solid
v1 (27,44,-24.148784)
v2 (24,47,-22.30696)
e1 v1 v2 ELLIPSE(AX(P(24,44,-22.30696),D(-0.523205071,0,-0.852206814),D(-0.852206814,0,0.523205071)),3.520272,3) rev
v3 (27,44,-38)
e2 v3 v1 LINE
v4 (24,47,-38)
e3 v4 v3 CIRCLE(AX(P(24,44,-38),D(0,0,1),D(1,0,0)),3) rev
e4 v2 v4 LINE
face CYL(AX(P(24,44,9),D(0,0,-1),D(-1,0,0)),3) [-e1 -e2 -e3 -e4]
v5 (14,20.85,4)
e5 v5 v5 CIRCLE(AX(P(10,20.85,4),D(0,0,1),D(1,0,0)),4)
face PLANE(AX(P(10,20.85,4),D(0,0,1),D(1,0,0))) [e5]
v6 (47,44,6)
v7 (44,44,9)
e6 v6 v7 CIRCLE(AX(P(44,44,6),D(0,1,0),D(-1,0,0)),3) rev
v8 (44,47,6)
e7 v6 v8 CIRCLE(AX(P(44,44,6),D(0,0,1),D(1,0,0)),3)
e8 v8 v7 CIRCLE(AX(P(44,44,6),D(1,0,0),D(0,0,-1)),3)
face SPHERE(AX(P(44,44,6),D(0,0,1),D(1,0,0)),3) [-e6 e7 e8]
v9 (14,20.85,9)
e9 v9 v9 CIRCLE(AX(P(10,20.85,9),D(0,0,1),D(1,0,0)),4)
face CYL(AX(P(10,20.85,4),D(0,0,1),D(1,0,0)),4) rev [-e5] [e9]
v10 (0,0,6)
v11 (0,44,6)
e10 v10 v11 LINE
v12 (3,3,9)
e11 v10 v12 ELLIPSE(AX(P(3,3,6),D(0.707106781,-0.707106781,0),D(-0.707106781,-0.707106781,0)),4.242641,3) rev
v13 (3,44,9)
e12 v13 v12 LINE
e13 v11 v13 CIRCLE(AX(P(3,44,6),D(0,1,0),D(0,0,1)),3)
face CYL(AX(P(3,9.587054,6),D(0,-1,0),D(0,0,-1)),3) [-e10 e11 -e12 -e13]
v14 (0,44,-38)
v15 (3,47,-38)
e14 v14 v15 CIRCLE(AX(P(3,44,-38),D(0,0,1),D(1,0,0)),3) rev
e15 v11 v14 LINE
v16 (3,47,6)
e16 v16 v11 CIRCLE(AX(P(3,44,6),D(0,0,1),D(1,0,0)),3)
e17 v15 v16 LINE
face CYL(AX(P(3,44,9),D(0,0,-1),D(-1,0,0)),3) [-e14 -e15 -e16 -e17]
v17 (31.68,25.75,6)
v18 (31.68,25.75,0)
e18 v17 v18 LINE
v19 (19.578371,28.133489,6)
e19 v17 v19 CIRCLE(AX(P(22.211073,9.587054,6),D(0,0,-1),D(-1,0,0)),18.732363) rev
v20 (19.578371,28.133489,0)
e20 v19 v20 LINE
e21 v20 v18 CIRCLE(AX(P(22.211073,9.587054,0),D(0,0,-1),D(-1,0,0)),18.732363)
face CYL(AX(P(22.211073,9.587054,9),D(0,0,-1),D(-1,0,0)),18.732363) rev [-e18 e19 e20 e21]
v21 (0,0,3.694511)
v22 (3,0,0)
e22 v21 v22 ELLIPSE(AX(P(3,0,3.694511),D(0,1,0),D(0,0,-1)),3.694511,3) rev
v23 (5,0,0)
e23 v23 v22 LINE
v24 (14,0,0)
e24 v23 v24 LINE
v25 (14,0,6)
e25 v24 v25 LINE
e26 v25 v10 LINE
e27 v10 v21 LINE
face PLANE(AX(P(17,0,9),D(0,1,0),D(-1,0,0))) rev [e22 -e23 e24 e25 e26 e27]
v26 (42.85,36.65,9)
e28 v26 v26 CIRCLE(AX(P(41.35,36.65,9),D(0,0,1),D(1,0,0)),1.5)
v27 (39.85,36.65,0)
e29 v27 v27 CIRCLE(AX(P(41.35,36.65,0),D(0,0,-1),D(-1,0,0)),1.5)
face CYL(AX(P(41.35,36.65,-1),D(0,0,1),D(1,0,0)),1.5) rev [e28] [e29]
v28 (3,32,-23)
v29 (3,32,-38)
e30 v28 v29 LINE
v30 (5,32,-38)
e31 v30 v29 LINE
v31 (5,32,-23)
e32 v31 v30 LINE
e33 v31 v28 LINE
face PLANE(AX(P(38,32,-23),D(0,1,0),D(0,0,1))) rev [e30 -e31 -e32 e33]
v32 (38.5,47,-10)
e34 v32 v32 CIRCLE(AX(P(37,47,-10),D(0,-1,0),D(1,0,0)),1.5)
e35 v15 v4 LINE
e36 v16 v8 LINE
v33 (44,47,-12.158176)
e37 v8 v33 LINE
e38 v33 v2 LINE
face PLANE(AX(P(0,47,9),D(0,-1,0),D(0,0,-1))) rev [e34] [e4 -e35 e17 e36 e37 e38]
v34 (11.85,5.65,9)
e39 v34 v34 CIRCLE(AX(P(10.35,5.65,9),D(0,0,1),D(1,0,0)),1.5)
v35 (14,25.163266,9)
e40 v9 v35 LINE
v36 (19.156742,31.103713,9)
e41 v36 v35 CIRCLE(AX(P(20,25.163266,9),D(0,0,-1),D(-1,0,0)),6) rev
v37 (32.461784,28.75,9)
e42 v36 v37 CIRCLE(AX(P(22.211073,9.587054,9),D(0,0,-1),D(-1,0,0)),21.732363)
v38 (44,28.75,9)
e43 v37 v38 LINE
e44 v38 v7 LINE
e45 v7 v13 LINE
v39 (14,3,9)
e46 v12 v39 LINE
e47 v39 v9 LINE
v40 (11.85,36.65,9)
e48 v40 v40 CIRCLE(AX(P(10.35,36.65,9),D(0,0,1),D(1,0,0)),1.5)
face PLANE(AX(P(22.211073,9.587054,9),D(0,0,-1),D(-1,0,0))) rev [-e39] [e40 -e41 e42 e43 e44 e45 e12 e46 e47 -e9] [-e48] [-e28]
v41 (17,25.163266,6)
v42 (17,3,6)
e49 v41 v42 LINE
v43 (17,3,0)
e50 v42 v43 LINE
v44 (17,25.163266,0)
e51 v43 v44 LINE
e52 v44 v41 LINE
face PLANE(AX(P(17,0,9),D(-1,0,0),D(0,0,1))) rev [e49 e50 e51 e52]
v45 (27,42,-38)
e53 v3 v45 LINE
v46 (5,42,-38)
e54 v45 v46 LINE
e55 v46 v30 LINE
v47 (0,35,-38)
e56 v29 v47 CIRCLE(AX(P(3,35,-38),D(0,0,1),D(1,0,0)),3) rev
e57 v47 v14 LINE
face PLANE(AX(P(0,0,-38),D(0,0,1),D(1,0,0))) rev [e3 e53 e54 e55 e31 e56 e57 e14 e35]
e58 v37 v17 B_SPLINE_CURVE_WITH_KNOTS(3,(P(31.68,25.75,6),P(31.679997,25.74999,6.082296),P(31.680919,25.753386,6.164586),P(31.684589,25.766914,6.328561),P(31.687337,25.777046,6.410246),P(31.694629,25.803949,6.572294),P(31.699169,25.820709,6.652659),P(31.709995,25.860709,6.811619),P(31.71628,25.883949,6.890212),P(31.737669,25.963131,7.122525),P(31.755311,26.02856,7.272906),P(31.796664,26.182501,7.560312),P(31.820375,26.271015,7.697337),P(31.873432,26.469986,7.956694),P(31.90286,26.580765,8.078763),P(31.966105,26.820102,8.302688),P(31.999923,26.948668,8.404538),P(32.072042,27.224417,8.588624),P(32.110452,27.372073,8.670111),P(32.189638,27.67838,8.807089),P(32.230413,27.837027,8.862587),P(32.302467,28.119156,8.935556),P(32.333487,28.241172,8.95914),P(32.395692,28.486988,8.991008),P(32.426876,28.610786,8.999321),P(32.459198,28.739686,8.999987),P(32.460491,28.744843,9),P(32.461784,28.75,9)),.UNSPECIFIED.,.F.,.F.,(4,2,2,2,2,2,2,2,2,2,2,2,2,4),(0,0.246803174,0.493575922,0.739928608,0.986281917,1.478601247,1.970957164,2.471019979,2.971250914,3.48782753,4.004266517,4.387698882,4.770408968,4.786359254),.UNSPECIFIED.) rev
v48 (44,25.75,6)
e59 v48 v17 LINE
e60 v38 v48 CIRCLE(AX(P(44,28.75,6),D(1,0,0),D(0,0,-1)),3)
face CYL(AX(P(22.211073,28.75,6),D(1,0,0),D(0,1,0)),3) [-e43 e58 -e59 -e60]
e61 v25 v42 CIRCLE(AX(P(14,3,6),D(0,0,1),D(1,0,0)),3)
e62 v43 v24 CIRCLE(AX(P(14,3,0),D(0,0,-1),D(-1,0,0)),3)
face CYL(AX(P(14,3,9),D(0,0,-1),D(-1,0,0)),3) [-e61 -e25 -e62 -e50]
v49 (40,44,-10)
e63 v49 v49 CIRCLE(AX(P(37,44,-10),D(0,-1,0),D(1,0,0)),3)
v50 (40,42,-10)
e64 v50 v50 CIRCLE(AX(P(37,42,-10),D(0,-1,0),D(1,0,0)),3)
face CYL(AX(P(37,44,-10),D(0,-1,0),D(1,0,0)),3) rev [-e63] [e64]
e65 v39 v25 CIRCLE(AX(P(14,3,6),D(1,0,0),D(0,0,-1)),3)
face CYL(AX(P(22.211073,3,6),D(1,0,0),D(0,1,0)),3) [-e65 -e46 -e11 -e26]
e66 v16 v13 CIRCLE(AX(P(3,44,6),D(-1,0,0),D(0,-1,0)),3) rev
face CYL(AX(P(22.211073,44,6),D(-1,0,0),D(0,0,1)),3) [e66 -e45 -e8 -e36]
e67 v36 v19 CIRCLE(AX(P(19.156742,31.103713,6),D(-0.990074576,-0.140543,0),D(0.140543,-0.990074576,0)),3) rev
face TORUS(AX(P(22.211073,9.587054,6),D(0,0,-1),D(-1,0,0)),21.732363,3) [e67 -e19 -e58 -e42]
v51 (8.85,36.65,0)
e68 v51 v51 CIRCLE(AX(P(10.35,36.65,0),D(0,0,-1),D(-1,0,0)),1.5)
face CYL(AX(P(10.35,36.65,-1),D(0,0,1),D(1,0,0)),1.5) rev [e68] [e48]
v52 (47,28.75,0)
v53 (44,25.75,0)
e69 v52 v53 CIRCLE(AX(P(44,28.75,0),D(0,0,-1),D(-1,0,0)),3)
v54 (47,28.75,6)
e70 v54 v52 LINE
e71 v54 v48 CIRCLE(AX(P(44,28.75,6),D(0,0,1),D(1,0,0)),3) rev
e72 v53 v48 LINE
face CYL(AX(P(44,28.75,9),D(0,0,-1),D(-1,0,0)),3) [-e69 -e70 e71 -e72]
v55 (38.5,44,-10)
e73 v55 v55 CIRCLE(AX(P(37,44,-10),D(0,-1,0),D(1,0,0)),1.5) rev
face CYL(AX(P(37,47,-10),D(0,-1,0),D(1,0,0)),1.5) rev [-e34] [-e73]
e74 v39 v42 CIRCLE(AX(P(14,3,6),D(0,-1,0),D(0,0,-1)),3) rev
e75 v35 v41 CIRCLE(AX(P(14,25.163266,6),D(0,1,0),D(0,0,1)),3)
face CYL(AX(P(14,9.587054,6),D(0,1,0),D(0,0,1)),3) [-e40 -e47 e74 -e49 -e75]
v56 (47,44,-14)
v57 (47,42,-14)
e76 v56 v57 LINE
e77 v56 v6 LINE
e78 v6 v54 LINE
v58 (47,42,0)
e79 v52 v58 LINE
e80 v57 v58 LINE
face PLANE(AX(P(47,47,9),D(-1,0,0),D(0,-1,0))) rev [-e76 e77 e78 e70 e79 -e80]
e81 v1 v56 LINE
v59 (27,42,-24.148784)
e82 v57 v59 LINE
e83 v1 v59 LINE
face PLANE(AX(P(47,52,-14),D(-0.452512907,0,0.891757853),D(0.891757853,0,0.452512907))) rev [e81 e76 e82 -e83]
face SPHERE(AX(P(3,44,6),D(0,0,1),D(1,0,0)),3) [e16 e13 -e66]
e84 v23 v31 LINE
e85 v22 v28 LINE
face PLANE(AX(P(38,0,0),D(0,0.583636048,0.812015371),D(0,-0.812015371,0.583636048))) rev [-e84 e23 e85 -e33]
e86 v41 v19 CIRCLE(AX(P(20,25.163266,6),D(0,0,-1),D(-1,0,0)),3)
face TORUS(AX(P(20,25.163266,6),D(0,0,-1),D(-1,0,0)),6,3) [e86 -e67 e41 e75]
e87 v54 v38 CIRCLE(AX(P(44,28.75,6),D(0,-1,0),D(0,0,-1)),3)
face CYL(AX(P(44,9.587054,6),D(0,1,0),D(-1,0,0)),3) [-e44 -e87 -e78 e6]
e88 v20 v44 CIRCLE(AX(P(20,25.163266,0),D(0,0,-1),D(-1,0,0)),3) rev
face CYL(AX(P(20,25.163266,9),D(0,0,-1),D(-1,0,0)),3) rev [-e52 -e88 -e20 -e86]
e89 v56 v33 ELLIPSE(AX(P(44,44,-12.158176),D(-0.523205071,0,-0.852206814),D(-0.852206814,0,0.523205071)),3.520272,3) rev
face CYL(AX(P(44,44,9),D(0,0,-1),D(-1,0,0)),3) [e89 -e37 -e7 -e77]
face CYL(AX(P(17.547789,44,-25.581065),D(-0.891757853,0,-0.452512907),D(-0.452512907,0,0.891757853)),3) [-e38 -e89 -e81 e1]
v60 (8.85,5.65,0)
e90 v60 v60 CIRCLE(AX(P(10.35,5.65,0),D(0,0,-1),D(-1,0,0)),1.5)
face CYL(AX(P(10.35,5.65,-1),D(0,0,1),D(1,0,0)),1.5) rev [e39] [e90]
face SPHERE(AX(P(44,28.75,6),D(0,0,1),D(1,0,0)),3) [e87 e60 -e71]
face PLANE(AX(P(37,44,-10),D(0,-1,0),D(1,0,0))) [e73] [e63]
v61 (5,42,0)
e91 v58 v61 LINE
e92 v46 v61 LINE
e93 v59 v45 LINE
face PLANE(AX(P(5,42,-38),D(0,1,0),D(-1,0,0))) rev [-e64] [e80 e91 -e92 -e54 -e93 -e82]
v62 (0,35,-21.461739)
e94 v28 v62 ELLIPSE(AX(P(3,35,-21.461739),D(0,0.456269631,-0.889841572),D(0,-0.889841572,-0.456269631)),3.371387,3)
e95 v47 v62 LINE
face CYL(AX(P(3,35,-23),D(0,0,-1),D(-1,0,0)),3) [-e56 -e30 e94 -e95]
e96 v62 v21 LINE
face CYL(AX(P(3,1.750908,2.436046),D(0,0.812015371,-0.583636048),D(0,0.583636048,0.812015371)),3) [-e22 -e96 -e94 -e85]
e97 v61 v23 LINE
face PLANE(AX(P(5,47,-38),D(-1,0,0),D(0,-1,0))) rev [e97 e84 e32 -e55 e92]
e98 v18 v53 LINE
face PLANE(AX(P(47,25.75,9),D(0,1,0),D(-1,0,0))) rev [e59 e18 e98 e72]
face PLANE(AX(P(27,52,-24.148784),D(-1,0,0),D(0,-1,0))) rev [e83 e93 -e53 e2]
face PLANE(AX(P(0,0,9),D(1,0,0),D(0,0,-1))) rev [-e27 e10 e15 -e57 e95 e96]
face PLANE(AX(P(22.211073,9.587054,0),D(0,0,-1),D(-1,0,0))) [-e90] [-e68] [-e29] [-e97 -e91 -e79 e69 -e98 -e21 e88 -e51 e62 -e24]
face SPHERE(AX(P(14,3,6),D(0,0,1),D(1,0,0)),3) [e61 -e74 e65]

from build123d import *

# Parameters (mm, degrees)
BOSS_EXTRUDE1_DEPTH = 9
SKETCH3_R           = 1.5
CUT_EXTRUDE1_DEPTH  = 10
SKETCH8_W           = 5
SKETCH8_H           = 47
BOSS_EXTRUDE2_DEPTH = 38
SKETCH9_W           = 42
SKETCH9_H           = 5
BOSS_EXTRUDE3_DEPTH = 38
CUT_EXTRUDE2_DEPTH  = 38
SKETCH11_R          = 4
CUT_EXTRUDE3_DEPTH  = 5
CUT_EXTRUDE4_DEPTH  = 10
SKETCH13_R          = 1.5
CUT_EXTRUDE5_DEPTH  = 74.600271739
SKETCH14_R          = 3
CUT_EXTRUDE6_DEPTH  = 2
FILLET1_R           = 3


with BuildPart() as part:
    # Sketch2 → Boss-Extrude1 (new body)
    with BuildSketch(Plane.XY):
        with BuildLine():
            Line((0, 0), (0, 47))
            Line((0, 47), (47, 47))
            Line((47, 47), (47, 25.75))
            Line((47, 25.75), (31.68, 25.75))
            ThreePointArc((31.68, 25.75), (24.5283031, 28.175540714), (17, 27.58))
            Line((17, 27.58), (17, 0))
            Line((17, 0), (0, 0))
        make_face()
    extrude(amount=BOSS_EXTRUDE1_DEPTH)

    # Sketch3 → Cut-Extrude1 (cut)
    with BuildSketch(Plane.XY.offset(9)):
        with Locations((10.35, 5.65)):
            Circle(SKETCH3_R)
        with Locations((10.35, 36.65)):
            Circle(SKETCH3_R)
        with Locations((41.35, 36.65)):
            Circle(SKETCH3_R)
    extrude(amount=-CUT_EXTRUDE1_DEPTH, mode=Mode.SUBTRACT)

    # Sketch8 → Boss-Extrude2 (add)
    with BuildSketch(Plane(origin=(0, 0, 0), x_dir=(-1, 0, 0), z_dir=(0, 0, -1))):
        with Locations((-2.5, 23.5)):
            Rectangle(SKETCH8_W, SKETCH8_H)
    extrude(amount=BOSS_EXTRUDE2_DEPTH)

    # Sketch9 → Boss-Extrude3 (add)
    with BuildSketch(Plane(origin=(0, 0, 0), x_dir=(-1, 0, 0), z_dir=(0, 0, -1))):
        with Locations((-26, 44.5)):
            Rectangle(SKETCH9_W, SKETCH9_H)
    extrude(amount=BOSS_EXTRUDE3_DEPTH)

    # Sketch10 → Cut-Extrude2 (cut)
    with BuildSketch(Plane.ZY):
        Polygon((0, 0), (-23, 32), (-38, 32), (-38, 0), align=None)
    extrude(amount=-CUT_EXTRUDE2_DEPTH, mode=Mode.SUBTRACT)

    # Sketch11 → Cut-Extrude3 (cut)
    with BuildSketch(Plane.XY.offset(9)):
        with Locations((10, 20.85)):
            Circle(SKETCH11_R)
    extrude(amount=-CUT_EXTRUDE3_DEPTH, mode=Mode.SUBTRACT)

    # Sketch12 → Cut-Extrude4 (cut)
    with BuildSketch(Plane.XZ.offset(-42)):
        Polygon((47, -38), (47, -14), (27, -24.148784343), (27, -38), align=None)
    extrude(amount=-CUT_EXTRUDE4_DEPTH, mode=Mode.SUBTRACT)

    # Sketch13 → Cut-Extrude5 (cut, through all)
    with BuildSketch(Plane.XZ.offset(-42)):
        with Locations((37, -10)):
            Circle(SKETCH13_R)
    extrude(amount=-CUT_EXTRUDE5_DEPTH, mode=Mode.SUBTRACT)

    # Sketch14 → Cut-Extrude6 (cut)
    with BuildSketch(Plane(origin=(0, 42, 0), x_dir=(-1, 0, 0), z_dir=(0, -1, 0))):
        with Locations(Location((-37, 10, 0), (0, 0, 180))):
            Circle(SKETCH14_R)
    extrude(amount=-CUT_EXTRUDE6_DEPTH, mode=Mode.SUBTRACT)

    # Fillet1
    fillet1_edges = [part.edges().sort_by_distance(p)[0] for p in [
        (24.5283031, 28.175540714, 9),
        (0, 47, -14.5),
        (47, 47, -2.5),
        (47, 25.75, 4.5),
        (17, 27.58, 4.5),
        (17, 0, 4.5),
        (39.34, 25.75, 9),
        (47, 36.375, 9),
        (23.5, 47, 9),
        (0, 23.5, 9),
        (8.5, 0, 9),
        (17, 13.79, 9),
        (0, 16, -11.5),
        (0, 32, -30.5),
        (27, 47, -31.074392172),
        (37, 47, -19.074392172),
    ]]
    fillet(fillet1_edges, radius=FILLET1_R - 0.0001)  # a hair under: the kernel refuses the full size


solid = part.part
